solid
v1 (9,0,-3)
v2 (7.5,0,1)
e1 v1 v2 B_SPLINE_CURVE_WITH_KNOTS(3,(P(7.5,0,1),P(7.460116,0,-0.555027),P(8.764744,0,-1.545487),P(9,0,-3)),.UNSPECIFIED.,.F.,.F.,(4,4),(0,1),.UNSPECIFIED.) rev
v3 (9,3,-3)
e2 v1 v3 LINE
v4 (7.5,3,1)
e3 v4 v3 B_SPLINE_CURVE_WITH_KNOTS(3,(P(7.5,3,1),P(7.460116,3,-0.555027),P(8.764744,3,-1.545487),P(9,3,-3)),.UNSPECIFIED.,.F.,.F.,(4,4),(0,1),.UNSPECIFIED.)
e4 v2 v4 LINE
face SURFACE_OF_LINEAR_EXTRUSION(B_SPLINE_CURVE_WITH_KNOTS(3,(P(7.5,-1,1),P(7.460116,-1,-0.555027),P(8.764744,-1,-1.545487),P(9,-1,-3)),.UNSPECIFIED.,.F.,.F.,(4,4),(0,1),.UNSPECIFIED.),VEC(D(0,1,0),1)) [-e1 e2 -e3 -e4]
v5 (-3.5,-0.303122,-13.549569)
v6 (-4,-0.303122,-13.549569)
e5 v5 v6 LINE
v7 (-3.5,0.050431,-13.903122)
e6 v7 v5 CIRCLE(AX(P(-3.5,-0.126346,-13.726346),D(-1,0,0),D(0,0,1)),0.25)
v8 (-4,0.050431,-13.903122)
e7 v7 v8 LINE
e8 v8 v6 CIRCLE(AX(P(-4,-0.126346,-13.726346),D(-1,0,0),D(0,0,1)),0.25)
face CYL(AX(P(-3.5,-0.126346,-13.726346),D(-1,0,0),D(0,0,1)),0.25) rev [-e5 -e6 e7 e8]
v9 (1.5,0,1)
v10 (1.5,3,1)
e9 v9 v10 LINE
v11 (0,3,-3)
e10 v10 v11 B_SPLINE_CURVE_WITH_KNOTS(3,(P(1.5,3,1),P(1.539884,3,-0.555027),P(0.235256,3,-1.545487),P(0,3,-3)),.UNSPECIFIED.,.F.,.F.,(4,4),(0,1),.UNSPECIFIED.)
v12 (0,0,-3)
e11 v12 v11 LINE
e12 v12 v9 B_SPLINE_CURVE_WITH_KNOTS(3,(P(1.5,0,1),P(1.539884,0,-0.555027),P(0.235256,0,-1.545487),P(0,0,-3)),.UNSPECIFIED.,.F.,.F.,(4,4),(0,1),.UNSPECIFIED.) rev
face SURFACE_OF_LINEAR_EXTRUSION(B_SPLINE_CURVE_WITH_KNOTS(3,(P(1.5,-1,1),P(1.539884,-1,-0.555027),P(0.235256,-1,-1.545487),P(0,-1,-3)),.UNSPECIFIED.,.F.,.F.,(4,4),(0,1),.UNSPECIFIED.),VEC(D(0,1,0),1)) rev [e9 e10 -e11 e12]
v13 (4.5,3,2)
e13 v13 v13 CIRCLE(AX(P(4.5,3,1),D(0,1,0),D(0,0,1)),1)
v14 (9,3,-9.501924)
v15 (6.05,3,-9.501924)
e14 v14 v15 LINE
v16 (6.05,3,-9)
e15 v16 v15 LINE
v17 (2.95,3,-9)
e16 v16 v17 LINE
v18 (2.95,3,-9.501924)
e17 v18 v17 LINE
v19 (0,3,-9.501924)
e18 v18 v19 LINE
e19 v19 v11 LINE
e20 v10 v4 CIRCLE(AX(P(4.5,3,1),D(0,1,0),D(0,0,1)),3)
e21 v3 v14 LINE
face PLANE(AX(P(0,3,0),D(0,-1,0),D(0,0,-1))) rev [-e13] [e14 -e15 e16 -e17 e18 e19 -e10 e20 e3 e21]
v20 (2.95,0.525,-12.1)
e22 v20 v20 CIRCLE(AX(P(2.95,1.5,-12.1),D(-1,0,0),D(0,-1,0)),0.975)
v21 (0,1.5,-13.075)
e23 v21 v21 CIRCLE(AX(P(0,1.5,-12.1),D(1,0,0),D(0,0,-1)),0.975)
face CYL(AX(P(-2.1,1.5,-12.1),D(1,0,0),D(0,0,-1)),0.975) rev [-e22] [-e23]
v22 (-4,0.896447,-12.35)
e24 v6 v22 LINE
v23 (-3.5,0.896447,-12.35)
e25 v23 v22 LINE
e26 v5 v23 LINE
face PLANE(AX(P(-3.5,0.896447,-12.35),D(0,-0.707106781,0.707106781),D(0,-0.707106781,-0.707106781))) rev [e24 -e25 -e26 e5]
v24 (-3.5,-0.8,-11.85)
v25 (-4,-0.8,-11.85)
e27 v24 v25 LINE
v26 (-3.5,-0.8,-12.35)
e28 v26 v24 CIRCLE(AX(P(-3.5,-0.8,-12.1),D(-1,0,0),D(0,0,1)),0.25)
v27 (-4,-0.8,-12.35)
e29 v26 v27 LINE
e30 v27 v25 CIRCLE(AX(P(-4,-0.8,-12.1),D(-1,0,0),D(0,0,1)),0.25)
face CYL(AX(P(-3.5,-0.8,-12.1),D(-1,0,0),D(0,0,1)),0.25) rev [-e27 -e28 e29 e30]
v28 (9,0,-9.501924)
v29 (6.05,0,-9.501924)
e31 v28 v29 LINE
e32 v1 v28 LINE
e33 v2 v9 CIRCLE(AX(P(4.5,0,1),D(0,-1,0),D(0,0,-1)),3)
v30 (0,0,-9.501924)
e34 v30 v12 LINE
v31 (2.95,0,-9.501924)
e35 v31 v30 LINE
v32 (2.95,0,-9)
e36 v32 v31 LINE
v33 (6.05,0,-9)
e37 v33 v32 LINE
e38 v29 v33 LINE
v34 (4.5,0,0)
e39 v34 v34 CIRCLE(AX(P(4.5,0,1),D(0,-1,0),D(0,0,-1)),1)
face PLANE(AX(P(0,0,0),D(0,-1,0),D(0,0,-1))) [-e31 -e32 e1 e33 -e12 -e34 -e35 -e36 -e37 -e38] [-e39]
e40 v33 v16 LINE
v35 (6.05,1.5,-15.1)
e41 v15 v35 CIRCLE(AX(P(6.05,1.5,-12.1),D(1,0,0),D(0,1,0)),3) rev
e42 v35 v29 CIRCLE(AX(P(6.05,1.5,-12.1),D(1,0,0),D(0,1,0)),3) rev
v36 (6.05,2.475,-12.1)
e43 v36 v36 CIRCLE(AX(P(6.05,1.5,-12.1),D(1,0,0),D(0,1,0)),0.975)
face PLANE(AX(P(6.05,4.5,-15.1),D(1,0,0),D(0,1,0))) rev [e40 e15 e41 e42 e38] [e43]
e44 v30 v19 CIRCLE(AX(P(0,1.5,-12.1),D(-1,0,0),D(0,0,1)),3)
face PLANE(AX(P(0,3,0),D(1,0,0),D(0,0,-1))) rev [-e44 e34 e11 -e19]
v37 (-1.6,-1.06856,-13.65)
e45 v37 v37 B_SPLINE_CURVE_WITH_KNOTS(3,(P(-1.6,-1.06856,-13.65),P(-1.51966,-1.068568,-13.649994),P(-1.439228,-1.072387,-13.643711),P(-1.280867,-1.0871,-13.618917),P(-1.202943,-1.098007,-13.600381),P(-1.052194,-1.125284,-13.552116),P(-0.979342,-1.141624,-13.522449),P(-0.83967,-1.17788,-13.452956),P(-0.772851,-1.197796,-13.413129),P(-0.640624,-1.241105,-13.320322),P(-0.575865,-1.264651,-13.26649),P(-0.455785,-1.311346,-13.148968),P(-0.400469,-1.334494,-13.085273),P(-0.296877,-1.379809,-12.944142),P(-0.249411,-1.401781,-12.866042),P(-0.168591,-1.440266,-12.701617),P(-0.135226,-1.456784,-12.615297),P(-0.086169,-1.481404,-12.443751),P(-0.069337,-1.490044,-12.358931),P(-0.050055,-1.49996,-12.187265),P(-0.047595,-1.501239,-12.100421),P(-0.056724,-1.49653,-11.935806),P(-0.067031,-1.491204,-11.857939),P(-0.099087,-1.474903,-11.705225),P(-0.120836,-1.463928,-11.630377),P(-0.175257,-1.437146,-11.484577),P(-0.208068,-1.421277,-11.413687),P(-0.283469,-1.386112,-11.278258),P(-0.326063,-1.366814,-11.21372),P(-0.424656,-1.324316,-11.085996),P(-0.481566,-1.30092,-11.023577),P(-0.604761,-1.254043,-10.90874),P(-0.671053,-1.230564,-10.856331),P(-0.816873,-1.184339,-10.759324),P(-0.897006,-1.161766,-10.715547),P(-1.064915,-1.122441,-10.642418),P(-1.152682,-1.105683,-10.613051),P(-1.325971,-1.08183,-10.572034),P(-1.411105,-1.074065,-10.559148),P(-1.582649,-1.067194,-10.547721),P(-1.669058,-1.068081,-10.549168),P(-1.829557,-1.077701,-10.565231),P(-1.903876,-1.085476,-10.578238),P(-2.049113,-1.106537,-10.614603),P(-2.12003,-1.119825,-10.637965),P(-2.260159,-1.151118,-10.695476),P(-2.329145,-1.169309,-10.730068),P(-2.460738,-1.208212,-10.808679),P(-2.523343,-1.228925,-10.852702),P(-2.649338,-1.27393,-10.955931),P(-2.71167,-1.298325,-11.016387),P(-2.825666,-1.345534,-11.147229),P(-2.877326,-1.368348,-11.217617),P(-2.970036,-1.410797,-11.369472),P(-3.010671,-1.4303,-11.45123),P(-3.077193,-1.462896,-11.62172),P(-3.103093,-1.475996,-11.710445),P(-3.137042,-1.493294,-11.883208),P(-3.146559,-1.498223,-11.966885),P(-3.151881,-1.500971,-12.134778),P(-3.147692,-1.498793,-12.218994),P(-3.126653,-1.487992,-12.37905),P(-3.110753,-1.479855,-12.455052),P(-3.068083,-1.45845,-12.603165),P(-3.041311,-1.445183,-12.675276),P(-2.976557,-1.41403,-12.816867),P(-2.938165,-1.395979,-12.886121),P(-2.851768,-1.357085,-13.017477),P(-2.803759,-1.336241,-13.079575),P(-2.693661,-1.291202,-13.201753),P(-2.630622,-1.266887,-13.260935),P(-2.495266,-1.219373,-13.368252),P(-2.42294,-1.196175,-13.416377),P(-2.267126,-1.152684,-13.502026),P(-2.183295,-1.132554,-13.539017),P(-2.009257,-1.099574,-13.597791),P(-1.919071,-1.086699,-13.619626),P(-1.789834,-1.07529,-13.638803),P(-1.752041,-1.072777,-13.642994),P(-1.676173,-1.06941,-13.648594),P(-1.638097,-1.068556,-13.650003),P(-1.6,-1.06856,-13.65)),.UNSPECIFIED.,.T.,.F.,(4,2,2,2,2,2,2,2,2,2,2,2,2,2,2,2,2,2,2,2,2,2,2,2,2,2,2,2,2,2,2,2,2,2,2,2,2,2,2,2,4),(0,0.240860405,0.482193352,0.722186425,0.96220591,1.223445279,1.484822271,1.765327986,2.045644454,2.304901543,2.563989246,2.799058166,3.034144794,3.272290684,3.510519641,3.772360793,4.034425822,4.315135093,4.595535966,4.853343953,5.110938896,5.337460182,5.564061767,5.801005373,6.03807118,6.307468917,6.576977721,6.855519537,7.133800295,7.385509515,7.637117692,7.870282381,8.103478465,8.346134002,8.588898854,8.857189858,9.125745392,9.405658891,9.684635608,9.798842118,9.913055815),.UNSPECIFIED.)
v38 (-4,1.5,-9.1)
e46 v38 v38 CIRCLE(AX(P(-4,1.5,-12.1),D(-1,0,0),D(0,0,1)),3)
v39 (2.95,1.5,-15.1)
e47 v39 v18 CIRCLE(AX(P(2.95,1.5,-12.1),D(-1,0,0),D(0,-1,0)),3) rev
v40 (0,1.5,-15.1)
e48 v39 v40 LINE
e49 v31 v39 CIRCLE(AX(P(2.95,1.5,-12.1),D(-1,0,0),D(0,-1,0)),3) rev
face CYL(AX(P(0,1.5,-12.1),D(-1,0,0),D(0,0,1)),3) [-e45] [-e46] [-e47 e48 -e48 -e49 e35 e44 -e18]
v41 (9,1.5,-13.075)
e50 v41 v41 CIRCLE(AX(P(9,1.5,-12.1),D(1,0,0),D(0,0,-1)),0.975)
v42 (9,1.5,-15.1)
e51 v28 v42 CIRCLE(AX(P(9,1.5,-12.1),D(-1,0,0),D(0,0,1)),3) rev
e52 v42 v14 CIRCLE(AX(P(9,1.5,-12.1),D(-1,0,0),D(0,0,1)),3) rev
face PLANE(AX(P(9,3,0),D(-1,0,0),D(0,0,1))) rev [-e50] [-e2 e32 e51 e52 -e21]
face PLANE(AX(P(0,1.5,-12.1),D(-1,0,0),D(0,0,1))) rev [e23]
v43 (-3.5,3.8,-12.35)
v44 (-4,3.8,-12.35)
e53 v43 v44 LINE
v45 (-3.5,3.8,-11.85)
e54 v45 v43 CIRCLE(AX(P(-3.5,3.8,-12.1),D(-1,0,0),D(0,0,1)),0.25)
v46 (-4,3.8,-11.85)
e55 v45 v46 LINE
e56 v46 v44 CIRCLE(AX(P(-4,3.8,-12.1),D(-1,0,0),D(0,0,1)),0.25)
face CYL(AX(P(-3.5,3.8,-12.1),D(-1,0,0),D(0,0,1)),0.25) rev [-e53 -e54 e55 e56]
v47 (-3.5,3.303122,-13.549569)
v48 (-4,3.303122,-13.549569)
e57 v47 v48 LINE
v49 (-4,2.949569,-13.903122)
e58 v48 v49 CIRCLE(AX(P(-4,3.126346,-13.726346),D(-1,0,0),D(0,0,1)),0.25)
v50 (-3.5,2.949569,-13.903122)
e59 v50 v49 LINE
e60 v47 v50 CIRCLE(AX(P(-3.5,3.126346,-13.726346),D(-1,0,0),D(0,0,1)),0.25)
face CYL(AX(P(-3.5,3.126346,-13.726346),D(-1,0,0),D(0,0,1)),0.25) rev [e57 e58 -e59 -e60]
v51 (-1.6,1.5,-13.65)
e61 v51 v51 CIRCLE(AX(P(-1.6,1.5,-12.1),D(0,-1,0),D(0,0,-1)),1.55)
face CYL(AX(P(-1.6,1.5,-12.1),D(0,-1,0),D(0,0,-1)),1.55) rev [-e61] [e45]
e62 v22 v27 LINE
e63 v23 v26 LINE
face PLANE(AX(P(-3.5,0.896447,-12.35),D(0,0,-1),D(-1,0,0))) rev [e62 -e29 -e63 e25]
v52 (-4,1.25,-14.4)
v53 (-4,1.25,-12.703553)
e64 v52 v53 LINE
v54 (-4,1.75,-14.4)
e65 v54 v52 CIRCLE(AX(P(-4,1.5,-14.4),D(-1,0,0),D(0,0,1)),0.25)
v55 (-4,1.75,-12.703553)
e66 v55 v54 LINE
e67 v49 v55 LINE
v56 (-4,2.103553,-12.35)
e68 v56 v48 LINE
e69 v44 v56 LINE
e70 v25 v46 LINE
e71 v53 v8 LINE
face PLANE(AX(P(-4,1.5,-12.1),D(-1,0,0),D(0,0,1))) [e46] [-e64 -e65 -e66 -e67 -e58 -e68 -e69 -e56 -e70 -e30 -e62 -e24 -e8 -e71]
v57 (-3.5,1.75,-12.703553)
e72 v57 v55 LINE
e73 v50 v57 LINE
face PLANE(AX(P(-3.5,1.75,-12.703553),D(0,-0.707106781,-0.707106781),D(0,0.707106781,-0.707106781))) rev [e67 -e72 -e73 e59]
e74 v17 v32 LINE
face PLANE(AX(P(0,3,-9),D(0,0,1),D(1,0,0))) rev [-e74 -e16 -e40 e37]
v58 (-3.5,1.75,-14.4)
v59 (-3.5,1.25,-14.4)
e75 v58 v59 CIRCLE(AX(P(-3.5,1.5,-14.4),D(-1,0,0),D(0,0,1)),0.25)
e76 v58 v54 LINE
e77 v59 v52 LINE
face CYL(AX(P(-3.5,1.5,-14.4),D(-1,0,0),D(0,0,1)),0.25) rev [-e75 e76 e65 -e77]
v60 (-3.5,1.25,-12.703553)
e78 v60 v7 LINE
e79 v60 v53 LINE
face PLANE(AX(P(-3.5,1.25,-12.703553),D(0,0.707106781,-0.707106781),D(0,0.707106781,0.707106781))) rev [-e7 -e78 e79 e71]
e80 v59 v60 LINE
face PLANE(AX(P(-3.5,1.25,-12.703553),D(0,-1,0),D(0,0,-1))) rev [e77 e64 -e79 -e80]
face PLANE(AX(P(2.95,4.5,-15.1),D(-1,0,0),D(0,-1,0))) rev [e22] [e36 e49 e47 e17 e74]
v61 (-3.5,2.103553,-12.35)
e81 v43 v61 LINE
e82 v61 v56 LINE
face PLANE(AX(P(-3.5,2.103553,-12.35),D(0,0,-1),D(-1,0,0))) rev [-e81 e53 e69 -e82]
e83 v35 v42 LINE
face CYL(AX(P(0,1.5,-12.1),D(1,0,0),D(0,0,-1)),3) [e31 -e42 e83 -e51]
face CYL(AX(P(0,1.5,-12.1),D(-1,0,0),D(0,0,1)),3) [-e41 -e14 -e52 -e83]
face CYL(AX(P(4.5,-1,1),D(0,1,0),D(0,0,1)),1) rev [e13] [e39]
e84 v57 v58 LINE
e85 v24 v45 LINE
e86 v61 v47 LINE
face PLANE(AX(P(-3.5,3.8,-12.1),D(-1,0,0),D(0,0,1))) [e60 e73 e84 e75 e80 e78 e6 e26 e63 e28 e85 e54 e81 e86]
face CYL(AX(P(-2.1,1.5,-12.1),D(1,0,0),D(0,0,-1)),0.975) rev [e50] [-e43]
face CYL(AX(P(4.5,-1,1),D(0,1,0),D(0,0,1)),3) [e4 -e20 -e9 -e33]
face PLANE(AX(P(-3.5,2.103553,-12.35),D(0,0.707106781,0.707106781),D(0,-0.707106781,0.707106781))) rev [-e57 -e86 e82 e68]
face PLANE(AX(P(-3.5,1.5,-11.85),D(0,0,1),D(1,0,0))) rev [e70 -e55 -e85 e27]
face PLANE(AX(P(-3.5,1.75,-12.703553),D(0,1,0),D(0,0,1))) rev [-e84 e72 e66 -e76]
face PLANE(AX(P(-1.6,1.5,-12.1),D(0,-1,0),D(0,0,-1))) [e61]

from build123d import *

# Parameters (mm, degrees)
SKETCH1_W           = 9
SKETCH1_H           = 9
BOSS_EXTRUDE1_DEPTH = 3
SKETCH2_W           = 2.95
SKETCH2_H           = 6
BOSS_EXTRUDE2_DEPTH = 6.1
FILLET1_R           = 3
SKETCH3_R           = 0.975
CUT_EXTRUDE1_DEPTH  = 11.1
CUT_EXTRUDE3_DEPTH  = 21.1
BOSS_EXTRUDE3_START = 4
SKETCH5_R           = 3
BOSS_EXTRUDE3_DEPTH = 4
SKETCH8_R           = 1.55
CUT_EXTRUDE4_DEPTH  = 3
CUT_EXTRUDE5_DEPTH  = 0.5
SKETCH10_W          = 9
SKETCH10_H          = 3
BOSS_EXTRUDE4_DEPTH = 4
SKETCH11_R          = 1
CUT_EXTRUDE6_DEPTH  = 4
CUT_EXTRUDE7_DEPTH  = 4


with BuildPart() as part:
    # Sketch1 → Boss-Extrude1 (new body)
    with BuildSketch(Plane(origin=(0, 0, 0), x_dir=(1, 0, 0), z_dir=(0, 1, 0))):
        with Locations((4.5, 4.5)):
            Rectangle(SKETCH1_W, SKETCH1_H)
    extrude(amount=BOSS_EXTRUDE1_DEPTH)

    # Sketch2 → Boss-Extrude2 (add)
    with BuildSketch(Plane(origin=(0, 0, -9), x_dir=(-1, 0, 0), z_dir=(0, 0, -1))):
        with Locations((-7.525, 1.5)):
            Rectangle(SKETCH2_W, SKETCH2_H)
        with Locations((-1.475, 1.5)):
            Rectangle(SKETCH2_W, SKETCH2_H)
    extrude(amount=BOSS_EXTRUDE2_DEPTH)

    # Fillet1
    fillet1_edges = [part.edges().sort_by_distance(p)[0] for p in [
        (1.475, 4.5, -15.1),
        (1.475, -1.5, -15.1),
        (7.525, -1.5, -15.1),
        (7.525, 4.5, -15.1),
    ]]
    fillet(fillet1_edges, radius=FILLET1_R - 0.0001)  # a hair under: the kernel refuses the full size

    # Sketch3 → Cut-Extrude1 (cut)
    with BuildSketch(Plane(origin=(9, 0, 0), x_dir=(0, 0, -1), z_dir=(1, 0, 0))):
        with Locations((12.1, 1.5)):
            Circle(SKETCH3_R)
    extrude(amount=-CUT_EXTRUDE1_DEPTH, mode=Mode.SUBTRACT)

    # Sketch6 → Cut-Extrude3 (cut)
    with BuildSketch(Plane.ZY):
        with BuildLine():
            Line((-12.1, 4.5), (-9, 4.5))
            Line((-9, 4.5), (-9, 3))
            Line((-9, 3), (-9.501923789, 3))
            ThreePointArc((-9.501923789, 3), (-10.6, 4.098076211), (-12.1, 4.5))
        make_face()
        with BuildLine():
            Line((-12.1, -1.5), (-9, -1.5))
            Line((-9, -1.5), (-9, 0))
            Line((-9, 0), (-9.501923789, 0))
            ThreePointArc((-9.501923789, 0), (-10.6, -1.098076211), (-12.1, -1.5))
        make_face()
    extrude(amount=-CUT_EXTRUDE3_DEPTH, mode=Mode.SUBTRACT)

    # Sketch5 → Boss-Extrude3 (add)
    with BuildSketch(Plane.ZY.offset(BOSS_EXTRUDE3_START)):
        with Locations((-12.1, 1.5)):
            Circle(SKETCH5_R)
    extrude(amount=-BOSS_EXTRUDE3_DEPTH)

    # Sketch8 → Cut-Extrude4 (cut)
    with BuildSketch(Plane(origin=(0, -1.5, 0), x_dir=(-1, 0, 0), z_dir=(0, -1, 0))):
        with Locations(Location((1.6, 12.1, 0), (0, 0, 90))):
            Circle(SKETCH8_R)
    extrude(amount=-CUT_EXTRUDE4_DEPTH, mode=Mode.SUBTRACT)

    # Sketch9 → Cut-Extrude5 (cut)
    with BuildSketch(Plane.ZY.offset(4)):
        with BuildLine():
            Line((-11.85, 1.5), (-11.85, -0.8))
            ThreePointArc((-11.85, -0.8), (-12.1, -1.05), (-12.35, -0.8))
            Line((-12.35, -0.8), (-12.35, 0.896446609))
            Line((-12.35, 0.896446609), (-13.549568901, -0.303122292))
            ThreePointArc((-13.549568901, -0.303122292), (-13.903122292, -0.303122292), (-13.903122292, 0.050431099))
            Line((-13.903122292, 0.050431099), (-12.703553391, 1.25))
            Line((-12.703553391, 1.25), (-14.4, 1.25))
            ThreePointArc((-14.4, 1.25), (-14.65, 1.5), (-14.4, 1.75))
            Line((-14.4, 1.75), (-12.703553391, 1.75))
            Line((-12.703553391, 1.75), (-13.903122292, 2.949568901))
            ThreePointArc((-13.903122292, 2.949568901), (-13.903122292, 3.303122292), (-13.549568901, 3.303122292))
            Line((-13.549568901, 3.303122292), (-12.35, 2.103553391))
            Line((-12.35, 2.103553391), (-12.35, 3.8))
            ThreePointArc((-12.35, 3.8), (-12.1, 4.05), (-11.85, 3.8))
            Line((-11.85, 3.8), (-11.85, 1.5))
        make_face()
    extrude(amount=-CUT_EXTRUDE5_DEPTH, mode=Mode.SUBTRACT)

    # Sketch10 → Boss-Extrude4 (add)
    with BuildSketch(Plane.XY):
        with Locations((4.5, 1.5)):
            Rectangle(SKETCH10_W, SKETCH10_H)
    extrude(amount=BOSS_EXTRUDE4_DEPTH)

    # Sketch11 → Cut-Extrude6 (cut)
    with BuildSketch(Plane(origin=(0, 3, 0), x_dir=(1, 0, 0), z_dir=(0, 1, 0))):
        with Locations(Location((4.5, -1, 0), (0, 0, 270))):
            Circle(SKETCH11_R)
    extrude(amount=-CUT_EXTRUDE6_DEPTH, mode=Mode.SUBTRACT)

    # Sketch12 → Cut-Extrude7 (cut)
    with BuildSketch(Plane(origin=(0, 3, 0), x_dir=(1, 0, 0), z_dir=(0, 1, 0))):
        with BuildLine():
            add(Edge.make_bspline(
                [(1.5, -1), (1.53988428, 0.555027292), (0.235256098, 1.545486909), (0, 3)],
                knots=[0, 0, 0, 0, 1, 1, 1, 1], degree=3))
            Line((0, 3), (0, -4))
            Line((0, -4), (4.5, -4))
            ThreePointArc((4.5, -4), (2.378679656, -3.121320344), (1.5, -1))
        make_face()
        with BuildLine():
            ThreePointArc((7.5, -1), (6.621320344, -3.121320344), (4.5, -4))
            Line((4.5, -4), (9, -4))
            Line((9, -4), (9, 3))
            add(Edge.make_bspline(
                [(7.5, -1), (7.46011572, 0.555027292), (8.764743902, 1.545486909), (9, 3)],
                knots=[0, 0, 0, 0, 1, 1, 1, 1], degree=3))
        make_face()
    extrude(amount=-CUT_EXTRUDE7_DEPTH, mode=Mode.SUBTRACT)


solid = part.part
